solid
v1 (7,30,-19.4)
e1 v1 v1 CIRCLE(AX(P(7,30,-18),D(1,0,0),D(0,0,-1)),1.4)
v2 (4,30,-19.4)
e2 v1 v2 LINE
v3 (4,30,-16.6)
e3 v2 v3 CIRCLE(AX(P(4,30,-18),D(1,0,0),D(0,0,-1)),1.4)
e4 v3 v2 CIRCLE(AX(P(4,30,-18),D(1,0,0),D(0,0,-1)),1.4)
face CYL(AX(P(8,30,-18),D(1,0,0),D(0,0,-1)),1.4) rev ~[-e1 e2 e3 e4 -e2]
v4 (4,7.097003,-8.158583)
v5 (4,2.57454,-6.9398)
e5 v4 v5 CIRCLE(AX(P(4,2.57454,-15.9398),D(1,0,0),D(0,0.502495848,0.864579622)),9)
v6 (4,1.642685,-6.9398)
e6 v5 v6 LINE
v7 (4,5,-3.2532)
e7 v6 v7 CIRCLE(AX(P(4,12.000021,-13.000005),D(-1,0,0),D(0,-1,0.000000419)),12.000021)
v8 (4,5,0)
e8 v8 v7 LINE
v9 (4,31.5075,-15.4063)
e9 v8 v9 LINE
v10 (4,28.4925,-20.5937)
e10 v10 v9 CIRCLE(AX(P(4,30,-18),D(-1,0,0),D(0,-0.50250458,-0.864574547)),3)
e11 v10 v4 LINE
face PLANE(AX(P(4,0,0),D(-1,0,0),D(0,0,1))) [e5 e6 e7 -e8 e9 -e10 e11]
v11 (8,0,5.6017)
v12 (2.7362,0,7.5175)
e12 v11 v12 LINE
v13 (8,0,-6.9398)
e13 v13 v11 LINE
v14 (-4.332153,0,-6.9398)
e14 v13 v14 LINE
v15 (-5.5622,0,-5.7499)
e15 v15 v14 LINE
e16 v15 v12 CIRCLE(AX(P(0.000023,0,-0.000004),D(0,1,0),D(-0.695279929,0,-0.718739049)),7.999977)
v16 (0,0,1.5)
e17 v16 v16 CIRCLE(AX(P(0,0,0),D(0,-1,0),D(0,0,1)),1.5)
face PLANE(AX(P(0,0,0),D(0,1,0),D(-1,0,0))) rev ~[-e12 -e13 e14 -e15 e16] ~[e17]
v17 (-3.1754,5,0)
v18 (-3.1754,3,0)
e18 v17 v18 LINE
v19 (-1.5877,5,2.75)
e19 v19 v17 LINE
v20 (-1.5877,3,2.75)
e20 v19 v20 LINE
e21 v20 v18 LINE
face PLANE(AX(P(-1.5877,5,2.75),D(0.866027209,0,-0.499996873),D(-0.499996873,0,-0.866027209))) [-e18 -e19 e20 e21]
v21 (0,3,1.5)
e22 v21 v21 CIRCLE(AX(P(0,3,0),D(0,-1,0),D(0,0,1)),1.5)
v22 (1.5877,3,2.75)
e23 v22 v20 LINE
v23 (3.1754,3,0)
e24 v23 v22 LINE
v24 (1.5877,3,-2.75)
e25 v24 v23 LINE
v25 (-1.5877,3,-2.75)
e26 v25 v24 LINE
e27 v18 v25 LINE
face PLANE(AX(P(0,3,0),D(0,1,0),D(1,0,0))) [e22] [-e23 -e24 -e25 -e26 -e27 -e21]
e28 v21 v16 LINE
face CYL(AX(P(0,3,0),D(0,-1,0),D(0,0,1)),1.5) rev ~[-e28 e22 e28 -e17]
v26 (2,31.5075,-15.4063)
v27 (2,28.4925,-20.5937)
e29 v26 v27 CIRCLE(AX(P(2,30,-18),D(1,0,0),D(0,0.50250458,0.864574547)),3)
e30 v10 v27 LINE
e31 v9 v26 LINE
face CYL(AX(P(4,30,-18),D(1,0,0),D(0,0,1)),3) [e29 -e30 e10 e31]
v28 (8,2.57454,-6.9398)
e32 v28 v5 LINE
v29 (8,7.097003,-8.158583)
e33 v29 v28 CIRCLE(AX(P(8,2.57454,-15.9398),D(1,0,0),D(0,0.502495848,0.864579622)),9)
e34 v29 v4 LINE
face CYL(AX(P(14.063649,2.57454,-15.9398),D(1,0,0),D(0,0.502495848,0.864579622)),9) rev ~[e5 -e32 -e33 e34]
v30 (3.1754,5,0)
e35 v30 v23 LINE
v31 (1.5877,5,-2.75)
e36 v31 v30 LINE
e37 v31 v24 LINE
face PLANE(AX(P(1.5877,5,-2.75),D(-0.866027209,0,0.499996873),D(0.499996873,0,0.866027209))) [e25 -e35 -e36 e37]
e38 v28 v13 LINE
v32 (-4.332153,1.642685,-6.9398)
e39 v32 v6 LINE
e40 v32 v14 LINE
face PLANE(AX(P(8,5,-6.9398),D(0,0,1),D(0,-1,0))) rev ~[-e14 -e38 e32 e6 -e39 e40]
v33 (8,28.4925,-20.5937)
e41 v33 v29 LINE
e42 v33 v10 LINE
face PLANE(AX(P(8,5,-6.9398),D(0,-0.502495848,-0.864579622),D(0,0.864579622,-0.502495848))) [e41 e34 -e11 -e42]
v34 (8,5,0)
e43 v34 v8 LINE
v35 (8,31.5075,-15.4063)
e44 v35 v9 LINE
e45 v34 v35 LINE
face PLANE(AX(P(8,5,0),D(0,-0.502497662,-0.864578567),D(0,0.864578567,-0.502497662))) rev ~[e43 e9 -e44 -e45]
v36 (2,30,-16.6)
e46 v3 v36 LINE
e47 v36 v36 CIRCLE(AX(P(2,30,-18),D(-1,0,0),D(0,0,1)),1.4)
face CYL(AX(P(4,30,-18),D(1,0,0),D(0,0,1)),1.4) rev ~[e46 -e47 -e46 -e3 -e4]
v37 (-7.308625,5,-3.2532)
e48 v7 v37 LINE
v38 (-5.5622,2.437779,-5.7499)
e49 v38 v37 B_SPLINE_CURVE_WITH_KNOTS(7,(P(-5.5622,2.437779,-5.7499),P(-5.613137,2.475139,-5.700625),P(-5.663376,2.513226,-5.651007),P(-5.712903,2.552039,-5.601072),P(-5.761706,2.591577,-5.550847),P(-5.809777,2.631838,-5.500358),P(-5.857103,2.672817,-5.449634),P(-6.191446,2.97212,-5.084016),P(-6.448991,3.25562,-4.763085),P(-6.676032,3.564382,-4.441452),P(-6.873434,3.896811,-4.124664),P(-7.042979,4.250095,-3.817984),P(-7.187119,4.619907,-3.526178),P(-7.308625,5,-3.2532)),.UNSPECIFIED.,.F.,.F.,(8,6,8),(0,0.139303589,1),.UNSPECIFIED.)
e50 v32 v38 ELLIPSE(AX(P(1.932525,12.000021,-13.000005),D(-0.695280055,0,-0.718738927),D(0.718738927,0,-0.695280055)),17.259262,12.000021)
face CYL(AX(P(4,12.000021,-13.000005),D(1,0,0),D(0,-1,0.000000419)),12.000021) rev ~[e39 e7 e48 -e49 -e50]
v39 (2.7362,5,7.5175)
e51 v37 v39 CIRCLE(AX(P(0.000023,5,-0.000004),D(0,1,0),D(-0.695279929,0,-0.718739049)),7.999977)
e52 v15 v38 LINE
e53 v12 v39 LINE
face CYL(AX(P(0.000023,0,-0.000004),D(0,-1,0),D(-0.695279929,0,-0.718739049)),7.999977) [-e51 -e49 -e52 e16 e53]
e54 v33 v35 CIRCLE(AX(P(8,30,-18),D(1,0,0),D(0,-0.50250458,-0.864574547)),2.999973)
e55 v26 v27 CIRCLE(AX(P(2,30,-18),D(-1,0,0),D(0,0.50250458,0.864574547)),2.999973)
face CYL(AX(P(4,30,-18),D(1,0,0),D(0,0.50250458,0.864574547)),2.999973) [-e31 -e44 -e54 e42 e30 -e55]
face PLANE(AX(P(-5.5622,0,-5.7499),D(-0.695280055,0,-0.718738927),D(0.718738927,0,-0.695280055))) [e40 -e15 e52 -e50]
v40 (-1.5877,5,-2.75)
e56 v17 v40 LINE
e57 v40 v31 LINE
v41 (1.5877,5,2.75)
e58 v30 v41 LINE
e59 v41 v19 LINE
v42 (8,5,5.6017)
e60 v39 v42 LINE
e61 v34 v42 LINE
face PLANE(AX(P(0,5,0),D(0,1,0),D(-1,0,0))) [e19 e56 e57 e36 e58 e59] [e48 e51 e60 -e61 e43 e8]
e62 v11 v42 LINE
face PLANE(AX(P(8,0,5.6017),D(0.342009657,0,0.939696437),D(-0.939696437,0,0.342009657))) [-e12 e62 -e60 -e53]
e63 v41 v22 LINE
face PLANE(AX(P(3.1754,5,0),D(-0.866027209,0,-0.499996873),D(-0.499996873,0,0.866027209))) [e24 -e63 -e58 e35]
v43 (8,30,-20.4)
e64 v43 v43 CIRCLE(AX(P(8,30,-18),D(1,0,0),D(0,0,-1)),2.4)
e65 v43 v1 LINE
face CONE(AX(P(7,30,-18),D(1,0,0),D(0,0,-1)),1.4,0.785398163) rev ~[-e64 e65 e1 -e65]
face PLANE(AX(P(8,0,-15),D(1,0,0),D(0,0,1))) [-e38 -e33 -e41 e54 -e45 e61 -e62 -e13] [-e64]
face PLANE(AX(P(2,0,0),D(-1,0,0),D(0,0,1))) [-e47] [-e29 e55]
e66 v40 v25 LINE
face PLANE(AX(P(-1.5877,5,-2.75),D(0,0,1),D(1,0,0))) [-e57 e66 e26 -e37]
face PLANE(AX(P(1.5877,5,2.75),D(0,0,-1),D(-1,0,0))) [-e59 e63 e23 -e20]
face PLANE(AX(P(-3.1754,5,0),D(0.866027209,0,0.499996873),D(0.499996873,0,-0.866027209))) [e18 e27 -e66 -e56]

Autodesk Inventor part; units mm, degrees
ref_plane "YZ Plane" through (0, 0, 0) normal (1, 0, 0) x (0, 1, 0)
ref_plane "XZ Plane" through (0, 0, 0) normal (0, 1, 0) x (-1, 0, 0)
sketch "Эскиз1" plane through (0, 0, 0) normal (0, 1, 0) x (-1, 0, 0)
  circle A0 centre (0, 0) radius 1.4
  arc A1 (5.5622, -5.7499) -> (-8, 0) centre (0, 0) ccw
  line L0 (5.5622, -5.7499) -> (-4, -15)
  line L1 (-4, -15) -> (-8, -15)
  line L2 (-8, -15) -> (-8, 0)
  line L3 (-8, 0) -> (-8, 5.6017)
  line L4 (-8, 5.6017) -> (-2.7362, 7.5175)
  line L5 (-2.7362, 7.5175) -> (-8, 0)
  point P0 (-6, -15)
  dimension "d0" = 2.8
  dimension "d1" = 8
  dimension "d3" = 15
  dimension "d4" = 4
  dimension "d46" = 110
extrude "Выдавливание1" add sketch "Эскиз1" along normal blind 5 contours A0 | L0 L1 L2 L5 A1 | L5 A1 | A1 L3 L4
sketch "Эскиз2" plane through (0, 5, 0) normal (0, 1, 0) x (1, 0, 0)
  line L0 (-3.1754, 0) -> (-1.5877, 2.75)
  line L1 (-1.5877, 2.75) -> (1.5877, 2.75)
  line L2 (1.5877, 2.75) -> (3.1754, 0)
  line L3 (3.1754, 0) -> (1.5877, -2.75)
  line L4 (1.5877, -2.75) -> (-1.5877, -2.75)
  line L5 (-1.5877, -2.75) -> (-3.1754, 0)
  point P0 (0, 0)
  point P1 (0, 0)
  dimension "d8" = 5.5
extrude "Выдавливание2" cut sketch "Эскиз2" against normal blind 2
ref_plane "РабПлоскость1" through (-4, 0, 0) normal (1, 0, 0) x (0, 0, -1)
sketch "Эскиз5" plane through (8, 0, 0) normal (1, 0, 0) x (0, 0, -1)
  line L0 (5.7499, 5) -> (-8, 5) projected
  circle A0 centre (18, 30) radius 1.4
  arc A1 (20.5937, 28.4925) -> (15.4063, 31.5075) centre (18, 30) ccw
  line L1 (0, 5) -> (15.4063, 31.5075)
  line L2 (15, 0) -> (15, 5) projected
  line L3 (-5.6017, 5) -> (15, 5) projected
  line L4 (0, 5) -> (0, 3) projected
  line L5 (0, 5) -> (-8, 5)
  line L6 (-8, 0) -> (-8, 5) projected
  line L7 (-8, 0) -> (-8, 5) projected
  line L8 (5.7499, 0) -> (5.7499, 5) projected
  line L9 (-8, 0) -> (5.7499, 0)
  line L10 (6.9398, 5) -> (20.5937, 28.4925)
  line L11 (5.7499, 0) -> (6.9398, 5)
  point P0 (0, 0)
  dimension "d24" = 2.8
  dimension "d38" = 25
  dimension "d40" = 3
  dimension "d45" = 3
extrude "Выдавливание4" add sketch "Эскиз5" against normal blind 4 contours L0 L1 A1 L10 L3
sketch "Эскиз6" plane through (4, 0, 0) normal (-1, 0, 0) x (0, 0, 1)
  circle A0 centre (-18, 30) radius 1.4 projected
  line L0 (-15, 0) -> (-15, 5) projected
  line L1 (-15, 0) -> (-13, 0)
  arc A1 (-13, 0) -> (-3.2532, 5) centre (-13, 12) ccw
  line L2 (-3.2532, 5) -> (-15, 5)
  line L3 (-15, 0) -> (-15, 28.4925) projected
  line L4 (-15, 0) -> (-15, 5)
  point P0 (0, 0)
  point P1 (-20.5937, 28.4925)
  point P2 (0, 5)
  dimension "d27" = 12
extrude "Выдавливание5" cut sketch "Эскиз6" along normal up to next contours L0 L2 A1 L1
chamfer "Фаска1" distance 1 angle 45 1 edges at (8, 30, -16.6)
sketch "Эскиз7" plane through (4, 0, 0) normal (-1, 0, 0) x (0, 0, 1)
  arc A0 (-15.4063, 31.5075) -> (-20.5937, 28.4925) centre (-18, 30) ccw projected
  circle A1 centre (-18, 30) radius 3
  circle A2 centre (-18, 30) radius 1.4
  point P0 (0, 0)
  dimension "d33" = 2.8
extrude "Выдавливание6" add sketch "Эскиз7" along normal blind 2
sketch "Эскиз10" plane through (8, 0, 0) normal (1, 0, 0) x (0, 0, -1)
  line L0 (6.9398, 5) -> (20.5937, 28.4925) projected
  line L1 (6.9398, 5) -> (6.9398, 0)
  line L2 (0, 0) -> (15, 0) projected
  line L3 (6.9398, 5) -> (15, 5) projected
  line L4 (6.9398, 5) -> (15, 5)
  line L5 (15, 5) -> (15, 0)
extrude "Выдавливание7" cut sketch "Эскиз10" against normal up to next
sketch "Эскиз11" plane through (2, 30, -18) normal (-1, 0, 0) x (0, 0, 1)
  point P0 (18, -30)
fillet "Сопряжение1" radius 9 1 edges at (6, 5, -6.9398)
sketch "Эскиз12" plane through (0, 3, 0) normal (0, 1, 0) x (1, 0, 0)
  point P0 (0, 0)
  point P1 (0, 0)
hole "Отверстие1" at (0, 3, 0) direction (0, -1, 0) diameter 3 end through all
properties part number "Wheelholder" material "Пластик АБС"
